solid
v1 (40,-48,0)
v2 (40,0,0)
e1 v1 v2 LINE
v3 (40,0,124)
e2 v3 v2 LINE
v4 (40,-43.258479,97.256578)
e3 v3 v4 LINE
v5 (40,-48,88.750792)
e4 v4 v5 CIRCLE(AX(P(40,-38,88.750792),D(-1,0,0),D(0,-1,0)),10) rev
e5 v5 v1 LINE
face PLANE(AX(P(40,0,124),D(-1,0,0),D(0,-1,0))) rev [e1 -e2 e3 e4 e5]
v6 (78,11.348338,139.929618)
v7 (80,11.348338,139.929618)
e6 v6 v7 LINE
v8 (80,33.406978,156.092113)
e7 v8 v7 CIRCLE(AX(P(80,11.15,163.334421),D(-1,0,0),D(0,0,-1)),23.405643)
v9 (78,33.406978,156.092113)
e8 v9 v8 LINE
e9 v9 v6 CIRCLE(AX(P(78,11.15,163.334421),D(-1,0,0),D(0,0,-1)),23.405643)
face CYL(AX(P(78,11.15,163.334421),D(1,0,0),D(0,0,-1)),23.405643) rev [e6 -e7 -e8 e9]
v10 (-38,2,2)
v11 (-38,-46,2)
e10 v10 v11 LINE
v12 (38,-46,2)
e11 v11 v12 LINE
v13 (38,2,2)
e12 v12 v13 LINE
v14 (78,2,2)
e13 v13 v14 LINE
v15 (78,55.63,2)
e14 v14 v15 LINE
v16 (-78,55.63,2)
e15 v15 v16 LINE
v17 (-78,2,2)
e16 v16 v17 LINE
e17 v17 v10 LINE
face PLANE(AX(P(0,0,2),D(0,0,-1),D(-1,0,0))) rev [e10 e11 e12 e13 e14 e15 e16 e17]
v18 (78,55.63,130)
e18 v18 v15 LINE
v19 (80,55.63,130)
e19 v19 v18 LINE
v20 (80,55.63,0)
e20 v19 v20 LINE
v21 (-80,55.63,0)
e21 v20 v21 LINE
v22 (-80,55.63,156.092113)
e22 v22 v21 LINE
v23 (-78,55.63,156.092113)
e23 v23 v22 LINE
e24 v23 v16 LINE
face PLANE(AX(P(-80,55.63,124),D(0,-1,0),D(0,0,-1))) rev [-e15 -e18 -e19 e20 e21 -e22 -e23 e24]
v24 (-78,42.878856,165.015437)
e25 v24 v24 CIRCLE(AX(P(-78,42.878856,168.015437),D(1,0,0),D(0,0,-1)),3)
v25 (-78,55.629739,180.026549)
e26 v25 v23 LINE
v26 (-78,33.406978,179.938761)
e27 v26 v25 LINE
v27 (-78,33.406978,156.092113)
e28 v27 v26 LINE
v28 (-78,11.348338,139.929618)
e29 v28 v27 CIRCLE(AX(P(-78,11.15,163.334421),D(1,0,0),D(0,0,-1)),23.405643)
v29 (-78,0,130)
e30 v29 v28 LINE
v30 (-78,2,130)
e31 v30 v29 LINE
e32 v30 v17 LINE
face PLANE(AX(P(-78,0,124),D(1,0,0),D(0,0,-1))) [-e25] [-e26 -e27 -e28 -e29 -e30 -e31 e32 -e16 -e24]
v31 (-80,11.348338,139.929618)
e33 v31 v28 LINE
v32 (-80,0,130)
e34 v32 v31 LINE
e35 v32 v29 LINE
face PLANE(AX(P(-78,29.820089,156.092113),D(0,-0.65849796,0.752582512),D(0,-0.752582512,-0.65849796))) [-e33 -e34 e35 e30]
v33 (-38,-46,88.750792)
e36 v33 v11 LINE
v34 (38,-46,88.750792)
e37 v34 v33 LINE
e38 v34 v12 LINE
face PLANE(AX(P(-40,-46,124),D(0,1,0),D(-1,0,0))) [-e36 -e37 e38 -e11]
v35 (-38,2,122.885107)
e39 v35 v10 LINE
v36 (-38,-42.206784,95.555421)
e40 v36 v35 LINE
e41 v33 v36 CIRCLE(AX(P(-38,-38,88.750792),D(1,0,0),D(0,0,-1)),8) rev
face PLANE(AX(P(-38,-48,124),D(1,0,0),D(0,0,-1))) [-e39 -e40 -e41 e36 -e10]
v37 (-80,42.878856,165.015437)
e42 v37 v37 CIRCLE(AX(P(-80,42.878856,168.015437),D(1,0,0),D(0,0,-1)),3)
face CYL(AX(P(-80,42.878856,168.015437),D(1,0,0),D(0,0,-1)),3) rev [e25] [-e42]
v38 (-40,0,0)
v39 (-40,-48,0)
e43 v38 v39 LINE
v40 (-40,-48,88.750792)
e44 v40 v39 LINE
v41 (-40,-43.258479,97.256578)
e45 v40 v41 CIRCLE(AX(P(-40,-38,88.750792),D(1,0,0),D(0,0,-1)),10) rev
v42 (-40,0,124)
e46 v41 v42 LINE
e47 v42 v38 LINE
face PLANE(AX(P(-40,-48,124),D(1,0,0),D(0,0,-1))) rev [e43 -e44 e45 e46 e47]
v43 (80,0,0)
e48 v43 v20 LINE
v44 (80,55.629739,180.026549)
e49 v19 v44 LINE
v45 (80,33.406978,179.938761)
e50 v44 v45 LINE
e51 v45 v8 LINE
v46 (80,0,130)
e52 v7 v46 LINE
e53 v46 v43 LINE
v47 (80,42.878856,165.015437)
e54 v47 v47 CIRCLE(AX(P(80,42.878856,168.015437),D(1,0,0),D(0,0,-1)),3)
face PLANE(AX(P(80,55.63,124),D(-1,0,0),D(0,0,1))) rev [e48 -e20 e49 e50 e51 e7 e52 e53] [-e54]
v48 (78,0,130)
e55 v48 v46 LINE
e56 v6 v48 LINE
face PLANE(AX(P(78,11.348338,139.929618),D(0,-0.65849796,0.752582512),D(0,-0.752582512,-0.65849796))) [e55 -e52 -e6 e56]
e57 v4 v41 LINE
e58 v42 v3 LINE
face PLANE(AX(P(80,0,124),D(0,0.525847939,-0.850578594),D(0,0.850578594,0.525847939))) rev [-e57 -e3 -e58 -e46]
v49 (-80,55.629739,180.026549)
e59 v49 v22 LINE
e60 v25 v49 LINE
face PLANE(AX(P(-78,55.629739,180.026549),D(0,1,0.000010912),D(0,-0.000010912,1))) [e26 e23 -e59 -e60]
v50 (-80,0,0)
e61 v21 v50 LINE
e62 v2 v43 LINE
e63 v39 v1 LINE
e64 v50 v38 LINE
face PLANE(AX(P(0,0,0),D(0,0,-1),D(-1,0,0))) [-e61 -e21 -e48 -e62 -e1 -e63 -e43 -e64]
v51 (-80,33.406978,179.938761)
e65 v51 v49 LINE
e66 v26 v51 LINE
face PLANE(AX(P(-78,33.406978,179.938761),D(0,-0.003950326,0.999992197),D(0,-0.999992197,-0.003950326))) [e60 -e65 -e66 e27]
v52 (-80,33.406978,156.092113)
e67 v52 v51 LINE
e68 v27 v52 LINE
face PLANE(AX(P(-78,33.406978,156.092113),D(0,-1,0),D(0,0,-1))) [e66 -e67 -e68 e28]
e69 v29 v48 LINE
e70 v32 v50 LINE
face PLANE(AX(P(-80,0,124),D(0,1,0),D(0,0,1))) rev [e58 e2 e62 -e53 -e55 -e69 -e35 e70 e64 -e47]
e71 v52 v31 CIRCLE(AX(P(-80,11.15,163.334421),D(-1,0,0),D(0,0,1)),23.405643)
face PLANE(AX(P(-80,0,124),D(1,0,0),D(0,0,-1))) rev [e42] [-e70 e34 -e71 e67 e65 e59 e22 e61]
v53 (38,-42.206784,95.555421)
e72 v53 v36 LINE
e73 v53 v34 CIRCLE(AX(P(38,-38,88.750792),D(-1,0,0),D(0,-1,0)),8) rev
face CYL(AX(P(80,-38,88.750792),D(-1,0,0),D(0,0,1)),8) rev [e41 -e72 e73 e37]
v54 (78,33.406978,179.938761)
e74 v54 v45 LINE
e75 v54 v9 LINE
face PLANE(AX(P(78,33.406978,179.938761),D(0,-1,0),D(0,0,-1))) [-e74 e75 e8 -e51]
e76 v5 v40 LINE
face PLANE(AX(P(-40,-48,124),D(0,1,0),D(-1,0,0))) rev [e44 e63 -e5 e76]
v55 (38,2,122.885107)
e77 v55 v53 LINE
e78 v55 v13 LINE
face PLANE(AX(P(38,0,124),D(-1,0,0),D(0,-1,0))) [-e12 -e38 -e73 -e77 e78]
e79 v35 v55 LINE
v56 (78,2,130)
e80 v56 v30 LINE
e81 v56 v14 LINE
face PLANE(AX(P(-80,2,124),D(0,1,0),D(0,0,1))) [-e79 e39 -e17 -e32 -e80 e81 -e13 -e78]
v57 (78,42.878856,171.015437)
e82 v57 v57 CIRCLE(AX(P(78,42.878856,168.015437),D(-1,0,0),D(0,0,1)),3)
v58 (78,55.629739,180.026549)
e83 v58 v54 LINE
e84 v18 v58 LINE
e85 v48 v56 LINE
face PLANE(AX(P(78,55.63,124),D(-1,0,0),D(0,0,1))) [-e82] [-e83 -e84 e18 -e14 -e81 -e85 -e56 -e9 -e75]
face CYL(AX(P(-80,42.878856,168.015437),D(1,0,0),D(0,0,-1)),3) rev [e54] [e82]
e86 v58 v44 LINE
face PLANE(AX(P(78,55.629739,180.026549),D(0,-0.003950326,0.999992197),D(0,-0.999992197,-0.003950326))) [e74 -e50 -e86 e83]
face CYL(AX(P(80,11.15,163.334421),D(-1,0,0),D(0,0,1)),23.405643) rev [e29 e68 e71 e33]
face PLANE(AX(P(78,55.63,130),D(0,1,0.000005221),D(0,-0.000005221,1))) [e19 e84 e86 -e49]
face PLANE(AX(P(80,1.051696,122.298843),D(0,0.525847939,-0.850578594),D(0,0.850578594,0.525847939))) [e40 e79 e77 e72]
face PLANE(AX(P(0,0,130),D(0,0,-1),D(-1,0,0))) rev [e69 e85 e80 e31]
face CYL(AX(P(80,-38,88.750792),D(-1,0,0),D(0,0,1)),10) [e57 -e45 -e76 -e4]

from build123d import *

# Parameters (mm, degrees)
EXTRUDE_1_DEPTH          = 124
SKETCH_2_W               = 160
SKETCH_2_H               = 55.63
EXTRUDE_2_DEPTH          = 6
CUT_EXTRUDE_1_DEPTH      = 186.458073159
CUT_EXTRUDE_1_DEPTH_BACK = 186.458073159
SHELL_START              = -78
SHELL_1_OUTLINE_W        = 53.63
SHELL_1_OUTLINE_H        = 126
SHELL_1_DEPTH            = 156
SHELL_START_2            = -38
SHELL_1_2_DEPTH          = 76
SKETCH_6_W               = 156
SKETCH_6_H               = 53.63
CUT_EXTRUDE_2_DEPTH      = 3
EXTRUDE_3_DEPTH          = 2
SKETCH_8_R               = 23.405642618
CUT_EXTRUDE_3_DEPTH      = 231.346358066
EXTRUDE_4_DEPTH          = 2
EXTRUDE_START            = -2
EXTRUDE_5_DEPTH          = 2
SKETCH_11_R              = 3
CUT_EXTRUDE_4_DEPTH      = 248.192749183


# Read off the part's stored shape, not the designer's step: 抽壳1
with BuildPart() as part:
    # 草图1 → 凸台-拉伸1 (new body)
    with BuildSketch(Plane.XY):
        Polygon((-80, 0), (-40, 0), (-40, -48), (40, -48), (40, 0), (80, 0), (80, 55.63), (-80, 55.63), align=None)
    extrude(amount=EXTRUDE_1_DEPTH)

    # 草图2 → 凸台-拉伸2 (add)
    with BuildSketch(Plane.XY.offset(124)):
        with Locations((0, 27.815)):
            Rectangle(SKETCH_2_W, SKETCH_2_H)
    extrude(amount=EXTRUDE_2_DEPTH)

    # 草图4 → 切除-拉伸1 (cut, two sides: drawn at the far end of the back side and taken through both)
    with BuildSketch(Plane.ZY.offset(40).offset(-CUT_EXTRUDE_1_DEPTH_BACK)):
        with BuildLine():
            Line((124, 0), (97.256578086, -43.258479388))
            ThreePointArc((97.256578086, -43.258479388), (93.619837537, -46.734551903), (88.750792142, -48))
            Line((88.750792142, -48), (88.750792142, -53.726448165))
            Line((88.750792142, -53.726448165), (126.100983763, -53.726448165))
            Line((126.100983763, -53.726448165), (126.100983763, 0))
            Line((126.100983763, 0), (124, 0))
        make_face()
    extrude(amount=CUT_EXTRUDE_1_DEPTH + CUT_EXTRUDE_1_DEPTH_BACK, mode=Mode.SUBTRACT)

    # 抽壳1 outline → 抽壳1 (cut)
    with BuildSketch(Plane.YZ.offset(SHELL_START)):
        with Locations((28.815, 65)):
            Rectangle(SHELL_1_OUTLINE_W, SHELL_1_OUTLINE_H)
    extrude(amount=SHELL_1_DEPTH, mode=Mode.SUBTRACT)

    # Shell 1 2 outline → Shell 1 2 (cut)
    with BuildSketch(Plane.YZ.offset(SHELL_START_2)):
        with BuildLine():
            Line((-46, 88.750792142), (-46, 2))
            Line((-46, 2), (2, 2))
            Line((2, 2), (2, 122.885106998))
            Line((2, 122.885106998), (-42.20678351, 95.555420897))
            ThreePointArc((-42.20678351, 95.555420897), (-44.987641522, 92.646028458), (-46, 88.750792142))
        make_face()
    extrude(amount=SHELL_1_2_DEPTH, mode=Mode.SUBTRACT)

    # 草图6 → 切除-拉伸2 (cut)
    with BuildSketch(Plane(origin=(0, 0, 128), x_dir=(-1, 0, 0), z_dir=(0, 0, -1))):
        with Locations((0, 28.815)):
            Rectangle(SKETCH_6_W, SKETCH_6_H)
    extrude(amount=-CUT_EXTRUDE_2_DEPTH, mode=Mode.SUBTRACT)

    # 草图7 → 凸台-拉伸3 (add)
    with BuildSketch(Plane.ZY.offset(80)):
        Polygon((130, 55.63), (156.092113107, 55.63), (156.092113107, 29.820089386), (130, 0), align=None)
    extrude(amount=-EXTRUDE_3_DEPTH)

    # 草图8 → 切除-拉伸3 (cut, through all)
    with BuildSketch(Plane.ZY.offset(80)):
        with Locations((163.334420687, 11.150000051)):
            Circle(SKETCH_8_R)
    extrude(amount=-CUT_EXTRUDE_3_DEPTH, mode=Mode.SUBTRACT)

    # 草图9 → 凸台-拉伸4 (add)
    with BuildSketch(Plane.ZY.offset(80)):
        Polygon((156.092113107, 33.406978446), (179.938761178, 33.406978446), (180.026549011, 55.62973882), (156.092113107, 55.63), align=None)
    extrude(amount=-EXTRUDE_4_DEPTH)

    # 草图10 → 凸台-拉伸5 (add)
    with BuildSketch(Plane(origin=(80, 0, 0), x_dir=(0, 0, -1), z_dir=(1, 0, 0)).offset(EXTRUDE_START)):
        with BuildLine():
            Line((-130, 55.63), (-180.026549011, 55.62973882))
            Line((-180.026549011, 55.62973882), (-179.938761178, 33.406978446))
            Line((-179.938761178, 33.406978446), (-156.092113107, 33.406978446))
            ThreePointArc((-156.092113107, 33.406978446), (-144.454345373, 24.983541264), (-139.929618433, 11.348337638))
            Line((-139.929618433, 11.348337638), (-130, 0))
            Line((-130, 0), (-130, 55.63))
        make_face()
    extrude(amount=EXTRUDE_5_DEPTH)

    # 草图11 → 切除-拉伸4 (cut, through all)
    with BuildSketch(Plane(origin=(80, 0, 0), x_dir=(0, 0, -1), z_dir=(1, 0, 0))):
        with Locations((-168.015437143, 42.878856115)):
            Circle(SKETCH_11_R)
    extrude(amount=-CUT_EXTRUDE_4_DEPTH, mode=Mode.SUBTRACT)


solid = part.part
